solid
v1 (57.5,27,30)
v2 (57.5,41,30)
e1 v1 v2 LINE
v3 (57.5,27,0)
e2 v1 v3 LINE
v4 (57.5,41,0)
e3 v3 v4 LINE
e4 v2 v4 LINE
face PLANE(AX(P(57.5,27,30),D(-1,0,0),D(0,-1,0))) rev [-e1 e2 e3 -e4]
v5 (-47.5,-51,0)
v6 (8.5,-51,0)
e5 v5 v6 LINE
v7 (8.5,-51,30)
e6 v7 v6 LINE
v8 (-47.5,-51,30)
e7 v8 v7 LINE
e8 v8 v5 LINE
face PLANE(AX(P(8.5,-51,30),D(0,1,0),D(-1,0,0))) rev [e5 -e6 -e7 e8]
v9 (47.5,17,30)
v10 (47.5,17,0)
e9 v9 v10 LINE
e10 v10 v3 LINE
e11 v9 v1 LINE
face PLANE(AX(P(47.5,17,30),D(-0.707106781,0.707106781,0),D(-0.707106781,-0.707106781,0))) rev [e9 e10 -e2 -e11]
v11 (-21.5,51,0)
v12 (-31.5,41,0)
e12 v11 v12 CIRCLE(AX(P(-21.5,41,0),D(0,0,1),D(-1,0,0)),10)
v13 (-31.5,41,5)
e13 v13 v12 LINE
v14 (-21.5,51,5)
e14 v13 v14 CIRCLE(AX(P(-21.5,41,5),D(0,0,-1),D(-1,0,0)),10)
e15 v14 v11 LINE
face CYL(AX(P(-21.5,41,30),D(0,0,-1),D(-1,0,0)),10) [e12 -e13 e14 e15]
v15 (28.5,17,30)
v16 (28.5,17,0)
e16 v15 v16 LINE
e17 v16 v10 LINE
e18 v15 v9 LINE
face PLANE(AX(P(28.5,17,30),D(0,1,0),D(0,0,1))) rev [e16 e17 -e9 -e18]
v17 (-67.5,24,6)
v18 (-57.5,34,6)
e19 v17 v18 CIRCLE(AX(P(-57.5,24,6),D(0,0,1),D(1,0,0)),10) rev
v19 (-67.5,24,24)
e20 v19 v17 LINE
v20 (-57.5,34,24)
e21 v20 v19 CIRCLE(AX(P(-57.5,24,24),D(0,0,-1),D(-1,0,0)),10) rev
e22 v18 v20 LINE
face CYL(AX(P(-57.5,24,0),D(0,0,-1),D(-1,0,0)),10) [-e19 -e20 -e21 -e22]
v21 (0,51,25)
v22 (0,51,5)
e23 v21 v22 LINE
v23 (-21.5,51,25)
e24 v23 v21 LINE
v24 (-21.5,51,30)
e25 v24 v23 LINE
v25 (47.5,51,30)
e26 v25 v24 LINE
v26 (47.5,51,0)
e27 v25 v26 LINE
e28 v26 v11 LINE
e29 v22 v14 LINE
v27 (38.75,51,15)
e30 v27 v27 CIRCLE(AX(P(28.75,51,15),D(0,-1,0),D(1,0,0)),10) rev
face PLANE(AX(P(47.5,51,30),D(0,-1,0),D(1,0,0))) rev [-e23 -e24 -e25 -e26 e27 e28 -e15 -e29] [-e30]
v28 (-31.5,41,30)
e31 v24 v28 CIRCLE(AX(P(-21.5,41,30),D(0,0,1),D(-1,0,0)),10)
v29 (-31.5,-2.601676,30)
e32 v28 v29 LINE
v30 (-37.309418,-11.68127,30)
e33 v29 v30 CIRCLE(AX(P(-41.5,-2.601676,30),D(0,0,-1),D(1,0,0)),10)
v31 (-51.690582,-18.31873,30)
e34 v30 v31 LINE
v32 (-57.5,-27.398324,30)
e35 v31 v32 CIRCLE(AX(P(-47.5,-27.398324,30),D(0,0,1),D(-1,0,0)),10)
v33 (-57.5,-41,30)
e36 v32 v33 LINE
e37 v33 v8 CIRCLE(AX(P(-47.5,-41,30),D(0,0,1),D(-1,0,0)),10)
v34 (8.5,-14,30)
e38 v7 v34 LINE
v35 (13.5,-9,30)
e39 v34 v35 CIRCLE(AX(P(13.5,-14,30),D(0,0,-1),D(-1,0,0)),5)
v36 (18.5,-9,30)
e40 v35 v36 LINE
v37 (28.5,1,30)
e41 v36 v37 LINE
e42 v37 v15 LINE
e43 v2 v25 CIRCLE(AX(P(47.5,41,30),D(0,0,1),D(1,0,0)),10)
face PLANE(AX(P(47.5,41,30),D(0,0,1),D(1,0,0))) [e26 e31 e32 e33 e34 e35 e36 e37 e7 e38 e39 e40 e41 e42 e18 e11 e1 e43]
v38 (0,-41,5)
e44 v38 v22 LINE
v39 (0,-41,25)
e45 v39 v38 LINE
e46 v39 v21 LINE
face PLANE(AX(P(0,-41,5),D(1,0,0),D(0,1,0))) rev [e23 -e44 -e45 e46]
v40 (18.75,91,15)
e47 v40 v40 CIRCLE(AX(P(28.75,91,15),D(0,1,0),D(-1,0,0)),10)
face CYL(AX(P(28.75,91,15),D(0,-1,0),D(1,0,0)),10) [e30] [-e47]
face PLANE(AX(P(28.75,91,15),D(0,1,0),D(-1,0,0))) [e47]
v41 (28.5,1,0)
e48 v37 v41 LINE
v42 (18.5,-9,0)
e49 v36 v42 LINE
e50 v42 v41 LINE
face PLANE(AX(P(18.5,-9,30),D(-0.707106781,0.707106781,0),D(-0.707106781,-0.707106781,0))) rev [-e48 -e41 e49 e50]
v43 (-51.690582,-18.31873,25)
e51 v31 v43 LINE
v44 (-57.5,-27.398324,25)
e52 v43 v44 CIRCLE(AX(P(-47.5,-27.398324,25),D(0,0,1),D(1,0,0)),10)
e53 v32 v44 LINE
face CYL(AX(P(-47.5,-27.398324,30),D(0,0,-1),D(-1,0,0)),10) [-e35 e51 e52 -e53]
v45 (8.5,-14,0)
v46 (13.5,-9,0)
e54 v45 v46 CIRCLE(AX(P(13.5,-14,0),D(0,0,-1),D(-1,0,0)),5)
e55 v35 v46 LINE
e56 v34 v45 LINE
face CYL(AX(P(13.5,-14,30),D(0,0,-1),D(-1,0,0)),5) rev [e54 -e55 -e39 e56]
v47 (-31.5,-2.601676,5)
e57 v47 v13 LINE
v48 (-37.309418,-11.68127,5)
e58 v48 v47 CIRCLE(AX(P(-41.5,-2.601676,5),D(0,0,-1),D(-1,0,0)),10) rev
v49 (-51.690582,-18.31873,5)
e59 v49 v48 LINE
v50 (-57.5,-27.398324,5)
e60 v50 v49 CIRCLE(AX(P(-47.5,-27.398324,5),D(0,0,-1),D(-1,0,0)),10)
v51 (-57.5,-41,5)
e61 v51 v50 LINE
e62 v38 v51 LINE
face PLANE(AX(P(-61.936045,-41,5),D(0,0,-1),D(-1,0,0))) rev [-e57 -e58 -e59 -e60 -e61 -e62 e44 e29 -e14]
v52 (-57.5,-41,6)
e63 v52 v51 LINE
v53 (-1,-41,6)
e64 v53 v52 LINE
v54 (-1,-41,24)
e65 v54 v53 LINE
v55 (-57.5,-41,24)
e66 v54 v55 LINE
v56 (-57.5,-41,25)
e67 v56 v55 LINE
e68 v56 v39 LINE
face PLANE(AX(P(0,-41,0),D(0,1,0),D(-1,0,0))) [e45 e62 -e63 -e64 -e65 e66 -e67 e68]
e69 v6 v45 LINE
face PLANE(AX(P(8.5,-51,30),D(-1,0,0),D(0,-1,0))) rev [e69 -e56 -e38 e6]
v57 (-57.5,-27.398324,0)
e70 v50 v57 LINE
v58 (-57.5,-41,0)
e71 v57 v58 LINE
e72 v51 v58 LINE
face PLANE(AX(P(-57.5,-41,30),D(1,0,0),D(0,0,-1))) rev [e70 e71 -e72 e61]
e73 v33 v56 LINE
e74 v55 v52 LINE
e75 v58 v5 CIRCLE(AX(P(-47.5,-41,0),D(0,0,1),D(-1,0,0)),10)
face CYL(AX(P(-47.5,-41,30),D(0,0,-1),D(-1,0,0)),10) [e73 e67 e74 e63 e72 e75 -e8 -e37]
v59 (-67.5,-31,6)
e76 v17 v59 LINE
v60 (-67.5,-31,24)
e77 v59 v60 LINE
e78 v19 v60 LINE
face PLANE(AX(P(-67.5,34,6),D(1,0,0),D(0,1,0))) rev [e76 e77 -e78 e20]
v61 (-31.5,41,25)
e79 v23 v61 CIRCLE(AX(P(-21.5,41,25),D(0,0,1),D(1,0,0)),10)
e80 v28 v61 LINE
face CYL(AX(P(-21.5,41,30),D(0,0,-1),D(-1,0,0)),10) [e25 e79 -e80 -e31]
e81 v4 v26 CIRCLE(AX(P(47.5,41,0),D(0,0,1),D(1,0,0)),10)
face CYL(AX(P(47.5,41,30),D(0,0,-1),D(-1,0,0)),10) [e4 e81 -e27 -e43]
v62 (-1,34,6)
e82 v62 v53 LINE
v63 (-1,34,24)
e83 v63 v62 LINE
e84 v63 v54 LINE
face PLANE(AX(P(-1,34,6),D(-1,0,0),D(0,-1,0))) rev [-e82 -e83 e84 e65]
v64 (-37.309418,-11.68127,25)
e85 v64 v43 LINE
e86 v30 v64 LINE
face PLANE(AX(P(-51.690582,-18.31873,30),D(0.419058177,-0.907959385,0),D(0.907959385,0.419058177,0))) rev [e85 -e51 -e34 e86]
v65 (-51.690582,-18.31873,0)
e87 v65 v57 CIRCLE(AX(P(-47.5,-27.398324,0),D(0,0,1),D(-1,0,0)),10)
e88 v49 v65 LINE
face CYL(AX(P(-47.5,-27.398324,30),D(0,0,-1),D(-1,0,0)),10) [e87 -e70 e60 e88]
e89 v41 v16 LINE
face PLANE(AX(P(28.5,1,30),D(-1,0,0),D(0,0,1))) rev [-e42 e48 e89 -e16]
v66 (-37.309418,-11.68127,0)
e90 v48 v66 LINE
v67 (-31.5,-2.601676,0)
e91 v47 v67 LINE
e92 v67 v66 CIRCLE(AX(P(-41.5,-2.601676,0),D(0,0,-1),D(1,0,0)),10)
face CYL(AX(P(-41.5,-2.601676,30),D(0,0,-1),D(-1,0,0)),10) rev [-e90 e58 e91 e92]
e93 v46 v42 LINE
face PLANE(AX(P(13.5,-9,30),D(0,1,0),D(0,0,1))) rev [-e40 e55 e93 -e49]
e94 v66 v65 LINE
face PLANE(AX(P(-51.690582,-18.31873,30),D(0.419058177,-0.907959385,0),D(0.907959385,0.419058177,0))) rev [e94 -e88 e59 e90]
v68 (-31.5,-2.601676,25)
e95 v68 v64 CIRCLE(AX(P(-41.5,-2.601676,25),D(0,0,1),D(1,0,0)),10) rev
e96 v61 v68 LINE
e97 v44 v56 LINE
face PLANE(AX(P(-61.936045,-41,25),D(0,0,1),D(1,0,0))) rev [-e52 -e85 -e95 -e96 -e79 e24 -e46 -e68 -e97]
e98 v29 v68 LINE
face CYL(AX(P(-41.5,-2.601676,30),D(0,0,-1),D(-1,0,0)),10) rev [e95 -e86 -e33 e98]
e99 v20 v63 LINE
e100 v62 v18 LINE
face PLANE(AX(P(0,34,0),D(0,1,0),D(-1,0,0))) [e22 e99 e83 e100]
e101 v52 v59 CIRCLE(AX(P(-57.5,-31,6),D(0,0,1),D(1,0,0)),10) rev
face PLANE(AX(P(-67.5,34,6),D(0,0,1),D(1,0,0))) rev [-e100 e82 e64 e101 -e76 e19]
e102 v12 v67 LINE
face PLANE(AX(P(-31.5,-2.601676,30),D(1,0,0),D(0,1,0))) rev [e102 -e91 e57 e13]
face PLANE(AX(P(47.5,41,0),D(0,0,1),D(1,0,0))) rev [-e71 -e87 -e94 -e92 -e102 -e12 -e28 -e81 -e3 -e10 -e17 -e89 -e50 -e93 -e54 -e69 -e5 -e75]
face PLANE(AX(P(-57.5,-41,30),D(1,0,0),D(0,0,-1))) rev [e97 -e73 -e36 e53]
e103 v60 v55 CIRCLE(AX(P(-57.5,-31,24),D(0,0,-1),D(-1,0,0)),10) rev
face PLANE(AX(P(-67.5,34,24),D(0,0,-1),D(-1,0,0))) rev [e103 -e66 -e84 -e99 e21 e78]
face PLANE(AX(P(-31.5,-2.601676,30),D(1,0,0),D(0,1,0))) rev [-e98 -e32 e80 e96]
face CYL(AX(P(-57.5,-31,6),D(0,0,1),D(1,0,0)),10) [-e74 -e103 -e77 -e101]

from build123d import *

# Parameters (mm, degrees)
BOSS_EXTRUDE1_DEPTH = 30
SKETCH2_W           = 61.936045122
SKETCH2_H           = 20
CUT_EXTRUDE1_DEPTH  = 92
SKETCH3_R           = 10
BOSS_EXTRUDE2_DEPTH = 40
SKETCH4_W           = 66.5
SKETCH4_H           = 18
BOSS_EXTRUDE3_DEPTH = 75
FILLET1_R           = 10
FILLET2_R           = 10


with BuildPart() as part:
    # Sketch1 → Boss-Extrude1 (new body)
    with BuildSketch(Plane.XY):
        with BuildLine():
            Line((-51.690581775, -18.31873005), (-37.309418225, -11.68126995))
            ThreePointArc((-37.309418225, -11.68126995), (-33.076645035, -7.99121144), (-31.5, -2.601676105))
            Line((-31.5, -2.601676105), (-31.5, 41))
            ThreePointArc((-31.5, 41), (-28.571067812, 48.071067812), (-21.5, 51))
            Line((-21.5, 51), (47.5, 51))
            ThreePointArc((47.5, 51), (54.571067812, 48.071067812), (57.5, 41))
            Line((57.5, 41), (57.5, 27))
            Line((57.5, 27), (47.5, 17))
            Line((47.5, 17), (28.5, 17))
            Line((28.5, 17), (28.5, 1))
            Line((28.5, 1), (18.5, -9))
            Line((18.5, -9), (13.5, -9))
            ThreePointArc((13.5, -9), (9.964466094, -10.464466094), (8.5, -14))
            Line((8.5, -14), (8.5, -51))
            Line((8.5, -51), (-47.5, -51))
            ThreePointArc((-47.5, -51), (-54.571067812, -48.071067812), (-57.5, -41))
            Line((-57.5, -41), (-57.5, -27.398323895))
            ThreePointArc((-57.5, -27.398323895), (-55.923354965, -22.00878856), (-51.690581775, -18.31873005))
        make_face()
    extrude(amount=BOSS_EXTRUDE1_DEPTH)

    # Sketch2 → Cut-Extrude1 (cut)
    with BuildSketch(Plane(origin=(0, 51, 0), x_dir=(1, 0, 0), z_dir=(0, 1, 0))):
        with Locations((-30.968022561, -15)):
            Rectangle(SKETCH2_W, SKETCH2_H)
    extrude(amount=-CUT_EXTRUDE1_DEPTH, mode=Mode.SUBTRACT)

    # Sketch3 → Boss-Extrude2 (add)
    with BuildSketch(Plane(origin=(0, 51, 0), x_dir=(1, 0, 0), z_dir=(0, 1, 0))):
        with Locations((28.75, -15)):
            Circle(SKETCH3_R)
    extrude(amount=BOSS_EXTRUDE2_DEPTH)

    # Sketch4 → Boss-Extrude3 (add)
    with BuildSketch(Plane(origin=(0, -41, 0), x_dir=(1, 0, 0), z_dir=(0, 1, 0))):
        with Locations((-34.25, -15)):
            Rectangle(SKETCH4_W, SKETCH4_H)
    extrude(amount=BOSS_EXTRUDE3_DEPTH)

    # Fillet1
    fillet1_edges = [part.edges().sort_by_distance(p)[0] for p in [
        (-67.5, -41, 15),
    ]]
    fillet(fillet1_edges, radius=FILLET1_R - 0.0001)  # a hair under: the kernel refuses the full size

    # Fillet2
    fillet2_edges = [part.edges().sort_by_distance(p)[0] for p in [
        (-67.5, 34, 15),
    ]]
    fillet(fillet2_edges, radius=FILLET2_R)


solid = part.part
